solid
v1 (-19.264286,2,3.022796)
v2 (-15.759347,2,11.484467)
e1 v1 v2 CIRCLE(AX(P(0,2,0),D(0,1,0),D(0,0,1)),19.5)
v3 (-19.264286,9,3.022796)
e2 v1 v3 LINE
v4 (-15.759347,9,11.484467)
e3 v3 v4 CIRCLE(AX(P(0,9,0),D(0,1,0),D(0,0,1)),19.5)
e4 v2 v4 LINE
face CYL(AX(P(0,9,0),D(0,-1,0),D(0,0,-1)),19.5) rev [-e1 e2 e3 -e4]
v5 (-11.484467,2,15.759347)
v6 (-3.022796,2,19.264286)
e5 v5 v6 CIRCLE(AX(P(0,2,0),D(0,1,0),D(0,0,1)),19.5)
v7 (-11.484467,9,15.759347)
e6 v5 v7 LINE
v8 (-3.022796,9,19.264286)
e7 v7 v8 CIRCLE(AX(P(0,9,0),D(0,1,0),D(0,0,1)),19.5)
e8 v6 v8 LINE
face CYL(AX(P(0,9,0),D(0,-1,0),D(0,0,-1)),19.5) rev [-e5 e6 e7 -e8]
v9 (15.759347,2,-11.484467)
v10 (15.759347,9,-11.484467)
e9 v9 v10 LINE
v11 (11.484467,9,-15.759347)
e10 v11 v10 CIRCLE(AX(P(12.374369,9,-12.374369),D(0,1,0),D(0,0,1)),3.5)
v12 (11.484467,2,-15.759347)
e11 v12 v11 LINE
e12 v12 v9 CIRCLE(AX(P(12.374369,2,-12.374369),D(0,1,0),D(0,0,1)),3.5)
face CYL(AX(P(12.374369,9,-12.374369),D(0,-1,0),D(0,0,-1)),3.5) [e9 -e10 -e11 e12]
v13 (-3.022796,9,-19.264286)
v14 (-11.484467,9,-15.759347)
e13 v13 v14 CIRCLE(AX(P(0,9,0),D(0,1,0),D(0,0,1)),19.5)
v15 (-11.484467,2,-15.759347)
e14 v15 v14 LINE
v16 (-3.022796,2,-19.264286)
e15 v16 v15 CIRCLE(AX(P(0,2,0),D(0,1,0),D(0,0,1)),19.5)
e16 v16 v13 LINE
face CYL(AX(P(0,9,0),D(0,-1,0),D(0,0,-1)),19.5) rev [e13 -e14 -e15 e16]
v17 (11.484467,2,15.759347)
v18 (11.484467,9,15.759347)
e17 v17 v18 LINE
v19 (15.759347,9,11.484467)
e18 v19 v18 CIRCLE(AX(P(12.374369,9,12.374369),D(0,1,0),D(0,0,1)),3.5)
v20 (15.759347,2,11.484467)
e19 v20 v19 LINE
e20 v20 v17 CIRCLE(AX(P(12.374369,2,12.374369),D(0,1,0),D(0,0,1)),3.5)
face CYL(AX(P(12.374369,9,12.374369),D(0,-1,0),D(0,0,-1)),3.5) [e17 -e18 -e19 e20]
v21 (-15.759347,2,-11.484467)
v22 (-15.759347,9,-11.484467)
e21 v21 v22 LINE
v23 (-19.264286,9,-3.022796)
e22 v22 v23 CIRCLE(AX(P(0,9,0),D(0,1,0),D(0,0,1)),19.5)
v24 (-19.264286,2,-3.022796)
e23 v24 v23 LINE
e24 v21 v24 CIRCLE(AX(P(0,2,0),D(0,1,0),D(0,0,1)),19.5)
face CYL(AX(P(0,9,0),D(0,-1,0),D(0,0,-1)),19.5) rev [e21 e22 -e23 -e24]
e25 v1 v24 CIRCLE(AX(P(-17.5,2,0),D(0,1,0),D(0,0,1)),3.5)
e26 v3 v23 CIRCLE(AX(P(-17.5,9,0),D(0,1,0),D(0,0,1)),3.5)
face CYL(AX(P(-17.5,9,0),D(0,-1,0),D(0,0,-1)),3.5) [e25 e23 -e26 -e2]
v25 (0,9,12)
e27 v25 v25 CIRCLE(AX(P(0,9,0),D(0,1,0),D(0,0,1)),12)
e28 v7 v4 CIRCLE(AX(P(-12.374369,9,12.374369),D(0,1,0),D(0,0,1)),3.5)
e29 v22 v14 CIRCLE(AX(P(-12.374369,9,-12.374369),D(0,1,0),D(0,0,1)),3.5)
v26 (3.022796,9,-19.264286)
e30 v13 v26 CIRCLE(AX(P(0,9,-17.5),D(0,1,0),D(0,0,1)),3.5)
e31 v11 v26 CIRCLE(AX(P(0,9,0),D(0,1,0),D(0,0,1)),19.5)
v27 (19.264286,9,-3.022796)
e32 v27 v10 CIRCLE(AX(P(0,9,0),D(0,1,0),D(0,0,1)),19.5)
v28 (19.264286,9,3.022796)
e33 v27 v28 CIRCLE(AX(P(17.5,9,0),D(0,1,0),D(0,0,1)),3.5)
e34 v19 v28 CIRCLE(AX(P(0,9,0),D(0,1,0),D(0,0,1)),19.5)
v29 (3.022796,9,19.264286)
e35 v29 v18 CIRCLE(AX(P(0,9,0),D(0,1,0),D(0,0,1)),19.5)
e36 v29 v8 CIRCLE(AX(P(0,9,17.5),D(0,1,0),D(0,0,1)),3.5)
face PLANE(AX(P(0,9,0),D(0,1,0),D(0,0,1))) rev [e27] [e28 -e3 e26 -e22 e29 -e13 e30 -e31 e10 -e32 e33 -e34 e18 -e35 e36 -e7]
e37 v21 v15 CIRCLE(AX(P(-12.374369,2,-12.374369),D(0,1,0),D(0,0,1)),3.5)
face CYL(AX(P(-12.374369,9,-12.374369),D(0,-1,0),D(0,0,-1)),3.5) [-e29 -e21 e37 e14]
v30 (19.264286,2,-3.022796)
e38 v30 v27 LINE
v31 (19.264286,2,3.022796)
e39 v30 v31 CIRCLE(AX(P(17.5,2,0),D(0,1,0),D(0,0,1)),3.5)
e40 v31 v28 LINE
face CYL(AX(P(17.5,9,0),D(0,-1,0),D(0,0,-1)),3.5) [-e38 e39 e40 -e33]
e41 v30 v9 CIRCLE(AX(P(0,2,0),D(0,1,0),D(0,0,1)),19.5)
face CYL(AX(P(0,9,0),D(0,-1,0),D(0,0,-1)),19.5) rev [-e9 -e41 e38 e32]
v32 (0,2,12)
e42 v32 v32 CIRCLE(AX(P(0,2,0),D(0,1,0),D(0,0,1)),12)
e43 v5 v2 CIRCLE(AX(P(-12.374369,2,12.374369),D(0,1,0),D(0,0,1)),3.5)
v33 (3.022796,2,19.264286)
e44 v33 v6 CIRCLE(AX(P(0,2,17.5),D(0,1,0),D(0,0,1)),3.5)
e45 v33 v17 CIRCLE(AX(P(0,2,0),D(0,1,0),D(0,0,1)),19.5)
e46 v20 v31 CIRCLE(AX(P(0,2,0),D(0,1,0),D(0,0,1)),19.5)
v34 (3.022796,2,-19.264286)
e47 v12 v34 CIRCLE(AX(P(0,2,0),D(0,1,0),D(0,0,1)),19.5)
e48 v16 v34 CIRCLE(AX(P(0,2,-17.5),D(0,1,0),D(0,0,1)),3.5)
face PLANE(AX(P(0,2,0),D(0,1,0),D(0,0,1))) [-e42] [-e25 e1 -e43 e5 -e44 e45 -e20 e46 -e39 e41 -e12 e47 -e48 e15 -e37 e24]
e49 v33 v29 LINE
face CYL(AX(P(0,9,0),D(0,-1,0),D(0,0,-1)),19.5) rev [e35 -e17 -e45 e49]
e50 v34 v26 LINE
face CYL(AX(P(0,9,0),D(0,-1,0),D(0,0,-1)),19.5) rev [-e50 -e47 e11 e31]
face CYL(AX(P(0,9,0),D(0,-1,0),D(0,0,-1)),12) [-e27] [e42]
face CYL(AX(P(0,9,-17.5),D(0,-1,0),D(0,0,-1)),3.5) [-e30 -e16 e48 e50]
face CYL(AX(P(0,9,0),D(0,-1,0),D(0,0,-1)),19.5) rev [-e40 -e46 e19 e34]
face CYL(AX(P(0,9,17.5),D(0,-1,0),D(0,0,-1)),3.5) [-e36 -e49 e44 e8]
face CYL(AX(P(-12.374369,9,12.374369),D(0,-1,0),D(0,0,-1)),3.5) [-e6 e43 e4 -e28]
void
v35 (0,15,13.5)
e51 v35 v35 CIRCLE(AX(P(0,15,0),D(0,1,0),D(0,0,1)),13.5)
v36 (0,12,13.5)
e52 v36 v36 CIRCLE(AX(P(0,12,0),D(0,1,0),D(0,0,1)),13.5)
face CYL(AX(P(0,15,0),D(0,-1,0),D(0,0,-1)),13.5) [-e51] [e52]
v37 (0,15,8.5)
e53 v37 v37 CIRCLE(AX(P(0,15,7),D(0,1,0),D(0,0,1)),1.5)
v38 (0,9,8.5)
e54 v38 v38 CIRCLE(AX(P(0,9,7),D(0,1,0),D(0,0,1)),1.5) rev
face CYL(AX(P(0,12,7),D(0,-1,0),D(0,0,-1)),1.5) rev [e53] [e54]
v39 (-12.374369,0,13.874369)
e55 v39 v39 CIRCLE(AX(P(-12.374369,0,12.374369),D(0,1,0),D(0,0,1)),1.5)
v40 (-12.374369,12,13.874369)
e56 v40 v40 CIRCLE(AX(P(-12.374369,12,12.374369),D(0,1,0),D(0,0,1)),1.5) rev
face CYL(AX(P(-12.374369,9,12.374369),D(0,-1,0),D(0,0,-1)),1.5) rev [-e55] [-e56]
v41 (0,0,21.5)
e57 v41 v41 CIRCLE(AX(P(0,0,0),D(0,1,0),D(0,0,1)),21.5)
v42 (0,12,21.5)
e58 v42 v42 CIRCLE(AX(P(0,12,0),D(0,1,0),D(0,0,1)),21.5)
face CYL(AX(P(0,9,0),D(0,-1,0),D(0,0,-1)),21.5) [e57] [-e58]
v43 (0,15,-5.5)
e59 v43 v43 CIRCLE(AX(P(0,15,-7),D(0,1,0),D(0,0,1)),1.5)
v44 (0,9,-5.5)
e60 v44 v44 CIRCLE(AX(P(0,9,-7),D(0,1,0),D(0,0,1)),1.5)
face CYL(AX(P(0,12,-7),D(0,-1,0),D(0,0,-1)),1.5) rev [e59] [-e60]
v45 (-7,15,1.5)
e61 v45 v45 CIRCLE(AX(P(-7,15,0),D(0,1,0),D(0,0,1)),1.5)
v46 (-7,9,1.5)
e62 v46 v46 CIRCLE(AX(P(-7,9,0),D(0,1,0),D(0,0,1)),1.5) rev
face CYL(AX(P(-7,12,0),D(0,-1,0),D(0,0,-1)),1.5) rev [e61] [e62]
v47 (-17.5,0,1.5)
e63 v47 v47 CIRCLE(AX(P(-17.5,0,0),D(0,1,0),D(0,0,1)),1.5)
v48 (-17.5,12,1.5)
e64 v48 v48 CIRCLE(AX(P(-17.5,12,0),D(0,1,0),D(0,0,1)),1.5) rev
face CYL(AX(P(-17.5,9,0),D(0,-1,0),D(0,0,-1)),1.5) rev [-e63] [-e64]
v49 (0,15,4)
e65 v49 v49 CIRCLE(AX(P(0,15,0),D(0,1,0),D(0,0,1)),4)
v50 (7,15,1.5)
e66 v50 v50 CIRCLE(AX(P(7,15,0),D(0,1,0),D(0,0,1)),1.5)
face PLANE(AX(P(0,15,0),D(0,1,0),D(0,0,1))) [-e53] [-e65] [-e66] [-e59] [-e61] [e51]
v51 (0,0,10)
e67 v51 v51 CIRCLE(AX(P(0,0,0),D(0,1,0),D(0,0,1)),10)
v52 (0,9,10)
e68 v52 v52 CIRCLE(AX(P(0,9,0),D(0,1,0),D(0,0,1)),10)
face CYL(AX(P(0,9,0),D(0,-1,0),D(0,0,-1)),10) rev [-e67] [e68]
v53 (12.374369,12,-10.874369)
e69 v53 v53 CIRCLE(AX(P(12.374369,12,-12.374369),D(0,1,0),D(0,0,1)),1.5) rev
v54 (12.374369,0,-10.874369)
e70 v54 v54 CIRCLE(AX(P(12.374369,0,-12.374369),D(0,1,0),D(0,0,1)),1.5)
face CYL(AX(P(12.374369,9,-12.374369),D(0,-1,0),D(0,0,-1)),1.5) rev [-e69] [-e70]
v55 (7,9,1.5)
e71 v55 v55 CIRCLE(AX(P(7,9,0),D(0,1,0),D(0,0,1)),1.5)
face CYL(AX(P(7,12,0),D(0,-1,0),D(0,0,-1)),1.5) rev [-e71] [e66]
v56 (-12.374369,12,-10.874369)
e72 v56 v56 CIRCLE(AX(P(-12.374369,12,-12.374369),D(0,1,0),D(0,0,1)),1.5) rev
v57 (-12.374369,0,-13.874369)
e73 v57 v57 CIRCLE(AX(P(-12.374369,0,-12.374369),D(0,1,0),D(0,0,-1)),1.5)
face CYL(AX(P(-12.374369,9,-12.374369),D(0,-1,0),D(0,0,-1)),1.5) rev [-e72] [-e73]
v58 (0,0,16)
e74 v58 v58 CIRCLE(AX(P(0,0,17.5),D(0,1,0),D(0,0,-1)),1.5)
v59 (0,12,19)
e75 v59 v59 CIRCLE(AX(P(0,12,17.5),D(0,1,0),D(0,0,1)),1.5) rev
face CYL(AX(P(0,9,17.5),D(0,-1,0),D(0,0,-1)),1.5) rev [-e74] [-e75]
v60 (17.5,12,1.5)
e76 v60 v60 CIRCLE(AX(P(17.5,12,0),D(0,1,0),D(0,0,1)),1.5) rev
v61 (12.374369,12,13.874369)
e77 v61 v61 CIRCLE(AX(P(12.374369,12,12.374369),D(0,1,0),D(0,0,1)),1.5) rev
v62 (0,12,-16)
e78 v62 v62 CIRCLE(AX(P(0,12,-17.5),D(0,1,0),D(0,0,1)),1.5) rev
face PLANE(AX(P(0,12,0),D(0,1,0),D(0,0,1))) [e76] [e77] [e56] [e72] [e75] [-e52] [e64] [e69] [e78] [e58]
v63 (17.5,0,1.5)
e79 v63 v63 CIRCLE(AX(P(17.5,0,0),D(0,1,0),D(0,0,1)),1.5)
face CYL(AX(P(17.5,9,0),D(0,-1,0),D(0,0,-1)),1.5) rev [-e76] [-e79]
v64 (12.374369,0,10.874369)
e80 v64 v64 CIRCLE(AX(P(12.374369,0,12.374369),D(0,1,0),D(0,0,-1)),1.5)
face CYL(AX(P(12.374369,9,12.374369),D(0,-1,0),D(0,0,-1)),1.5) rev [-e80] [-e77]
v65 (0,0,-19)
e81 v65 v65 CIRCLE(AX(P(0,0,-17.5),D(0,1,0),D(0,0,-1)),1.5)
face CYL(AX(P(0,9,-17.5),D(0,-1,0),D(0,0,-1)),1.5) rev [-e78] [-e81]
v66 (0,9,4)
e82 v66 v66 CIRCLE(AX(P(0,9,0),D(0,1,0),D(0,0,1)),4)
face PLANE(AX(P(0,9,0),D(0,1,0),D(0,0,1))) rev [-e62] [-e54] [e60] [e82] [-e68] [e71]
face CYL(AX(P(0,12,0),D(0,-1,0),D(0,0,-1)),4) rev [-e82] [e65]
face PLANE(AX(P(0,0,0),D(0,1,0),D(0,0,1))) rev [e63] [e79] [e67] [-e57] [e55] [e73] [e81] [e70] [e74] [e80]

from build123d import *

# Parameters (mm, degrees)
SKETCH_1_R            = 21.5
SKETCH_1_R_2          = 1.5
SKETCH_1_R_3          = 10
EXTRUDE_1_DEPTH       = 9
SHELL_4_T             = -2
EXTRUDE_2_OUTLINE_R   = 21.5
EXTRUDE_2_OUTLINE_R_2 = 1.5
EXTRUDE_2_OUTLINE_R_3 = 4
EXTRUDE_2_DEPTH       = 3
SKETCH_5_R            = 13.5
SKETCH_5_R_2          = 1.5
SKETCH_5_R_3          = 4
EXTRUDE_3_DEPTH       = 3


# Read off the part's stored shape, not the designer's step: 凸台-拉伸2
with BuildPart() as part:
    # 草图1 → 凸台-拉伸1 (new body)
    with BuildSketch(Plane(origin=(0, 0, 0), x_dir=(1, 0, 0), z_dir=(0, 1, 0))):
        with Locations(Location((0, 0, 0), (0, 0, 270))):
            Circle(SKETCH_1_R)
        with Locations(Location((12.374368671, 12.374368671, 0), (0, 0, 270))):
            Circle(SKETCH_1_R_2, mode=Mode.SUBTRACT)
        with Locations(Location((0, 0, 0), (0, 0, 270))):
            Circle(SKETCH_1_R_3, mode=Mode.SUBTRACT)
        with Locations(Location((12.374368671, -12.374368671, 0), (0, 0, 90))):
            Circle(SKETCH_1_R_2, mode=Mode.SUBTRACT)
        with Locations(Location((-12.374368671, -12.374368671, 0), (0, 0, 270))):
            Circle(SKETCH_1_R_2, mode=Mode.SUBTRACT)
        with Locations(Location((-12.374368671, 12.374368671, 0), (0, 0, 90))):
            Circle(SKETCH_1_R_2, mode=Mode.SUBTRACT)
        with Locations(Location((0, 17.5, 0), (0, 0, 90))):
            Circle(SKETCH_1_R_2, mode=Mode.SUBTRACT)
        with Locations(Location((17.5, 0, 0), (0, 0, 270))):
            Circle(SKETCH_1_R_2, mode=Mode.SUBTRACT)
        with Locations(Location((0, -17.5, 0), (0, 0, 90))):
            Circle(SKETCH_1_R_2, mode=Mode.SUBTRACT)
        with Locations(Location((-17.5, 0, 0), (0, 0, 270))):
            Circle(SKETCH_1_R_2, mode=Mode.SUBTRACT)
    extrude(amount=EXTRUDE_1_DEPTH)

    # 抽壳4
    shell_4_openings = [part.faces().sort_by_distance(p)[0] for p in [
        (0, 9, -20.891888168),
    ]]
    offset(amount=SHELL_4_T, openings=shell_4_openings, kind=Kind.INTERSECTION)

    # 凸台-拉伸2 outline → 凸台-拉伸2 (add)
    with BuildSketch(Plane(origin=(0, 9, 0), x_dir=(1, 0, 0), z_dir=(0, 1, 0))):
        Circle(EXTRUDE_2_OUTLINE_R)
        with Locations((-12.374368671, -12.374368671)):
            Circle(EXTRUDE_2_OUTLINE_R_2, mode=Mode.SUBTRACT)
        with Locations((0, -17.5)):
            Circle(EXTRUDE_2_OUTLINE_R_2, mode=Mode.SUBTRACT)
        with Locations((12.374368671, -12.374368671)):
            Circle(EXTRUDE_2_OUTLINE_R_2, mode=Mode.SUBTRACT)
        with Locations((0, -7)):
            Circle(EXTRUDE_2_OUTLINE_R_2, mode=Mode.SUBTRACT)
        with Locations((-17.5, 0)):
            Circle(EXTRUDE_2_OUTLINE_R_2, mode=Mode.SUBTRACT)
        with Locations((-7, 0)):
            Circle(EXTRUDE_2_OUTLINE_R_2, mode=Mode.SUBTRACT)
        with Locations((-12.374368671, 12.374368671)):
            Circle(EXTRUDE_2_OUTLINE_R_2, mode=Mode.SUBTRACT)
        Circle(EXTRUDE_2_OUTLINE_R_3, mode=Mode.SUBTRACT)
        with Locations((7, 0)):
            Circle(EXTRUDE_2_OUTLINE_R_2, mode=Mode.SUBTRACT)
        with Locations((0, 7)):
            Circle(EXTRUDE_2_OUTLINE_R_2, mode=Mode.SUBTRACT)
        with Locations((17.5, 0)):
            Circle(EXTRUDE_2_OUTLINE_R_2, mode=Mode.SUBTRACT)
        with Locations((0, 17.5)):
            Circle(EXTRUDE_2_OUTLINE_R_2, mode=Mode.SUBTRACT)
        with Locations((12.374368671, 12.374368671)):
            Circle(EXTRUDE_2_OUTLINE_R_2, mode=Mode.SUBTRACT)
    extrude(amount=EXTRUDE_2_DEPTH)

    # 草图5 → 凸台-拉伸3 (add)
    with BuildSketch(Plane(origin=(0, 12, 0), x_dir=(1, 0, 0), z_dir=(0, 1, 0))):
        with Locations(Location((0, 0, 0), (0, 0, 270))):
            Circle(SKETCH_5_R)
        with Locations(Location((-7, 0, 0), (0, 0, 270))):
            Circle(SKETCH_5_R_2, mode=Mode.SUBTRACT)
        with Locations(Location((0, -7, 0), (0, 0, 270))):
            Circle(SKETCH_5_R_2, mode=Mode.SUBTRACT)
        with Locations(Location((7, 0, 0), (0, 0, 270))):
            Circle(SKETCH_5_R_2, mode=Mode.SUBTRACT)
        with Locations(Location((0, 0, 0), (0, 0, 270))):
            Circle(SKETCH_5_R_3, mode=Mode.SUBTRACT)
        with Locations(Location((0, 7, 0), (0, 0, 270))):
            Circle(SKETCH_5_R_2, mode=Mode.SUBTRACT)
    extrude(amount=EXTRUDE_3_DEPTH)


solid = part.part
